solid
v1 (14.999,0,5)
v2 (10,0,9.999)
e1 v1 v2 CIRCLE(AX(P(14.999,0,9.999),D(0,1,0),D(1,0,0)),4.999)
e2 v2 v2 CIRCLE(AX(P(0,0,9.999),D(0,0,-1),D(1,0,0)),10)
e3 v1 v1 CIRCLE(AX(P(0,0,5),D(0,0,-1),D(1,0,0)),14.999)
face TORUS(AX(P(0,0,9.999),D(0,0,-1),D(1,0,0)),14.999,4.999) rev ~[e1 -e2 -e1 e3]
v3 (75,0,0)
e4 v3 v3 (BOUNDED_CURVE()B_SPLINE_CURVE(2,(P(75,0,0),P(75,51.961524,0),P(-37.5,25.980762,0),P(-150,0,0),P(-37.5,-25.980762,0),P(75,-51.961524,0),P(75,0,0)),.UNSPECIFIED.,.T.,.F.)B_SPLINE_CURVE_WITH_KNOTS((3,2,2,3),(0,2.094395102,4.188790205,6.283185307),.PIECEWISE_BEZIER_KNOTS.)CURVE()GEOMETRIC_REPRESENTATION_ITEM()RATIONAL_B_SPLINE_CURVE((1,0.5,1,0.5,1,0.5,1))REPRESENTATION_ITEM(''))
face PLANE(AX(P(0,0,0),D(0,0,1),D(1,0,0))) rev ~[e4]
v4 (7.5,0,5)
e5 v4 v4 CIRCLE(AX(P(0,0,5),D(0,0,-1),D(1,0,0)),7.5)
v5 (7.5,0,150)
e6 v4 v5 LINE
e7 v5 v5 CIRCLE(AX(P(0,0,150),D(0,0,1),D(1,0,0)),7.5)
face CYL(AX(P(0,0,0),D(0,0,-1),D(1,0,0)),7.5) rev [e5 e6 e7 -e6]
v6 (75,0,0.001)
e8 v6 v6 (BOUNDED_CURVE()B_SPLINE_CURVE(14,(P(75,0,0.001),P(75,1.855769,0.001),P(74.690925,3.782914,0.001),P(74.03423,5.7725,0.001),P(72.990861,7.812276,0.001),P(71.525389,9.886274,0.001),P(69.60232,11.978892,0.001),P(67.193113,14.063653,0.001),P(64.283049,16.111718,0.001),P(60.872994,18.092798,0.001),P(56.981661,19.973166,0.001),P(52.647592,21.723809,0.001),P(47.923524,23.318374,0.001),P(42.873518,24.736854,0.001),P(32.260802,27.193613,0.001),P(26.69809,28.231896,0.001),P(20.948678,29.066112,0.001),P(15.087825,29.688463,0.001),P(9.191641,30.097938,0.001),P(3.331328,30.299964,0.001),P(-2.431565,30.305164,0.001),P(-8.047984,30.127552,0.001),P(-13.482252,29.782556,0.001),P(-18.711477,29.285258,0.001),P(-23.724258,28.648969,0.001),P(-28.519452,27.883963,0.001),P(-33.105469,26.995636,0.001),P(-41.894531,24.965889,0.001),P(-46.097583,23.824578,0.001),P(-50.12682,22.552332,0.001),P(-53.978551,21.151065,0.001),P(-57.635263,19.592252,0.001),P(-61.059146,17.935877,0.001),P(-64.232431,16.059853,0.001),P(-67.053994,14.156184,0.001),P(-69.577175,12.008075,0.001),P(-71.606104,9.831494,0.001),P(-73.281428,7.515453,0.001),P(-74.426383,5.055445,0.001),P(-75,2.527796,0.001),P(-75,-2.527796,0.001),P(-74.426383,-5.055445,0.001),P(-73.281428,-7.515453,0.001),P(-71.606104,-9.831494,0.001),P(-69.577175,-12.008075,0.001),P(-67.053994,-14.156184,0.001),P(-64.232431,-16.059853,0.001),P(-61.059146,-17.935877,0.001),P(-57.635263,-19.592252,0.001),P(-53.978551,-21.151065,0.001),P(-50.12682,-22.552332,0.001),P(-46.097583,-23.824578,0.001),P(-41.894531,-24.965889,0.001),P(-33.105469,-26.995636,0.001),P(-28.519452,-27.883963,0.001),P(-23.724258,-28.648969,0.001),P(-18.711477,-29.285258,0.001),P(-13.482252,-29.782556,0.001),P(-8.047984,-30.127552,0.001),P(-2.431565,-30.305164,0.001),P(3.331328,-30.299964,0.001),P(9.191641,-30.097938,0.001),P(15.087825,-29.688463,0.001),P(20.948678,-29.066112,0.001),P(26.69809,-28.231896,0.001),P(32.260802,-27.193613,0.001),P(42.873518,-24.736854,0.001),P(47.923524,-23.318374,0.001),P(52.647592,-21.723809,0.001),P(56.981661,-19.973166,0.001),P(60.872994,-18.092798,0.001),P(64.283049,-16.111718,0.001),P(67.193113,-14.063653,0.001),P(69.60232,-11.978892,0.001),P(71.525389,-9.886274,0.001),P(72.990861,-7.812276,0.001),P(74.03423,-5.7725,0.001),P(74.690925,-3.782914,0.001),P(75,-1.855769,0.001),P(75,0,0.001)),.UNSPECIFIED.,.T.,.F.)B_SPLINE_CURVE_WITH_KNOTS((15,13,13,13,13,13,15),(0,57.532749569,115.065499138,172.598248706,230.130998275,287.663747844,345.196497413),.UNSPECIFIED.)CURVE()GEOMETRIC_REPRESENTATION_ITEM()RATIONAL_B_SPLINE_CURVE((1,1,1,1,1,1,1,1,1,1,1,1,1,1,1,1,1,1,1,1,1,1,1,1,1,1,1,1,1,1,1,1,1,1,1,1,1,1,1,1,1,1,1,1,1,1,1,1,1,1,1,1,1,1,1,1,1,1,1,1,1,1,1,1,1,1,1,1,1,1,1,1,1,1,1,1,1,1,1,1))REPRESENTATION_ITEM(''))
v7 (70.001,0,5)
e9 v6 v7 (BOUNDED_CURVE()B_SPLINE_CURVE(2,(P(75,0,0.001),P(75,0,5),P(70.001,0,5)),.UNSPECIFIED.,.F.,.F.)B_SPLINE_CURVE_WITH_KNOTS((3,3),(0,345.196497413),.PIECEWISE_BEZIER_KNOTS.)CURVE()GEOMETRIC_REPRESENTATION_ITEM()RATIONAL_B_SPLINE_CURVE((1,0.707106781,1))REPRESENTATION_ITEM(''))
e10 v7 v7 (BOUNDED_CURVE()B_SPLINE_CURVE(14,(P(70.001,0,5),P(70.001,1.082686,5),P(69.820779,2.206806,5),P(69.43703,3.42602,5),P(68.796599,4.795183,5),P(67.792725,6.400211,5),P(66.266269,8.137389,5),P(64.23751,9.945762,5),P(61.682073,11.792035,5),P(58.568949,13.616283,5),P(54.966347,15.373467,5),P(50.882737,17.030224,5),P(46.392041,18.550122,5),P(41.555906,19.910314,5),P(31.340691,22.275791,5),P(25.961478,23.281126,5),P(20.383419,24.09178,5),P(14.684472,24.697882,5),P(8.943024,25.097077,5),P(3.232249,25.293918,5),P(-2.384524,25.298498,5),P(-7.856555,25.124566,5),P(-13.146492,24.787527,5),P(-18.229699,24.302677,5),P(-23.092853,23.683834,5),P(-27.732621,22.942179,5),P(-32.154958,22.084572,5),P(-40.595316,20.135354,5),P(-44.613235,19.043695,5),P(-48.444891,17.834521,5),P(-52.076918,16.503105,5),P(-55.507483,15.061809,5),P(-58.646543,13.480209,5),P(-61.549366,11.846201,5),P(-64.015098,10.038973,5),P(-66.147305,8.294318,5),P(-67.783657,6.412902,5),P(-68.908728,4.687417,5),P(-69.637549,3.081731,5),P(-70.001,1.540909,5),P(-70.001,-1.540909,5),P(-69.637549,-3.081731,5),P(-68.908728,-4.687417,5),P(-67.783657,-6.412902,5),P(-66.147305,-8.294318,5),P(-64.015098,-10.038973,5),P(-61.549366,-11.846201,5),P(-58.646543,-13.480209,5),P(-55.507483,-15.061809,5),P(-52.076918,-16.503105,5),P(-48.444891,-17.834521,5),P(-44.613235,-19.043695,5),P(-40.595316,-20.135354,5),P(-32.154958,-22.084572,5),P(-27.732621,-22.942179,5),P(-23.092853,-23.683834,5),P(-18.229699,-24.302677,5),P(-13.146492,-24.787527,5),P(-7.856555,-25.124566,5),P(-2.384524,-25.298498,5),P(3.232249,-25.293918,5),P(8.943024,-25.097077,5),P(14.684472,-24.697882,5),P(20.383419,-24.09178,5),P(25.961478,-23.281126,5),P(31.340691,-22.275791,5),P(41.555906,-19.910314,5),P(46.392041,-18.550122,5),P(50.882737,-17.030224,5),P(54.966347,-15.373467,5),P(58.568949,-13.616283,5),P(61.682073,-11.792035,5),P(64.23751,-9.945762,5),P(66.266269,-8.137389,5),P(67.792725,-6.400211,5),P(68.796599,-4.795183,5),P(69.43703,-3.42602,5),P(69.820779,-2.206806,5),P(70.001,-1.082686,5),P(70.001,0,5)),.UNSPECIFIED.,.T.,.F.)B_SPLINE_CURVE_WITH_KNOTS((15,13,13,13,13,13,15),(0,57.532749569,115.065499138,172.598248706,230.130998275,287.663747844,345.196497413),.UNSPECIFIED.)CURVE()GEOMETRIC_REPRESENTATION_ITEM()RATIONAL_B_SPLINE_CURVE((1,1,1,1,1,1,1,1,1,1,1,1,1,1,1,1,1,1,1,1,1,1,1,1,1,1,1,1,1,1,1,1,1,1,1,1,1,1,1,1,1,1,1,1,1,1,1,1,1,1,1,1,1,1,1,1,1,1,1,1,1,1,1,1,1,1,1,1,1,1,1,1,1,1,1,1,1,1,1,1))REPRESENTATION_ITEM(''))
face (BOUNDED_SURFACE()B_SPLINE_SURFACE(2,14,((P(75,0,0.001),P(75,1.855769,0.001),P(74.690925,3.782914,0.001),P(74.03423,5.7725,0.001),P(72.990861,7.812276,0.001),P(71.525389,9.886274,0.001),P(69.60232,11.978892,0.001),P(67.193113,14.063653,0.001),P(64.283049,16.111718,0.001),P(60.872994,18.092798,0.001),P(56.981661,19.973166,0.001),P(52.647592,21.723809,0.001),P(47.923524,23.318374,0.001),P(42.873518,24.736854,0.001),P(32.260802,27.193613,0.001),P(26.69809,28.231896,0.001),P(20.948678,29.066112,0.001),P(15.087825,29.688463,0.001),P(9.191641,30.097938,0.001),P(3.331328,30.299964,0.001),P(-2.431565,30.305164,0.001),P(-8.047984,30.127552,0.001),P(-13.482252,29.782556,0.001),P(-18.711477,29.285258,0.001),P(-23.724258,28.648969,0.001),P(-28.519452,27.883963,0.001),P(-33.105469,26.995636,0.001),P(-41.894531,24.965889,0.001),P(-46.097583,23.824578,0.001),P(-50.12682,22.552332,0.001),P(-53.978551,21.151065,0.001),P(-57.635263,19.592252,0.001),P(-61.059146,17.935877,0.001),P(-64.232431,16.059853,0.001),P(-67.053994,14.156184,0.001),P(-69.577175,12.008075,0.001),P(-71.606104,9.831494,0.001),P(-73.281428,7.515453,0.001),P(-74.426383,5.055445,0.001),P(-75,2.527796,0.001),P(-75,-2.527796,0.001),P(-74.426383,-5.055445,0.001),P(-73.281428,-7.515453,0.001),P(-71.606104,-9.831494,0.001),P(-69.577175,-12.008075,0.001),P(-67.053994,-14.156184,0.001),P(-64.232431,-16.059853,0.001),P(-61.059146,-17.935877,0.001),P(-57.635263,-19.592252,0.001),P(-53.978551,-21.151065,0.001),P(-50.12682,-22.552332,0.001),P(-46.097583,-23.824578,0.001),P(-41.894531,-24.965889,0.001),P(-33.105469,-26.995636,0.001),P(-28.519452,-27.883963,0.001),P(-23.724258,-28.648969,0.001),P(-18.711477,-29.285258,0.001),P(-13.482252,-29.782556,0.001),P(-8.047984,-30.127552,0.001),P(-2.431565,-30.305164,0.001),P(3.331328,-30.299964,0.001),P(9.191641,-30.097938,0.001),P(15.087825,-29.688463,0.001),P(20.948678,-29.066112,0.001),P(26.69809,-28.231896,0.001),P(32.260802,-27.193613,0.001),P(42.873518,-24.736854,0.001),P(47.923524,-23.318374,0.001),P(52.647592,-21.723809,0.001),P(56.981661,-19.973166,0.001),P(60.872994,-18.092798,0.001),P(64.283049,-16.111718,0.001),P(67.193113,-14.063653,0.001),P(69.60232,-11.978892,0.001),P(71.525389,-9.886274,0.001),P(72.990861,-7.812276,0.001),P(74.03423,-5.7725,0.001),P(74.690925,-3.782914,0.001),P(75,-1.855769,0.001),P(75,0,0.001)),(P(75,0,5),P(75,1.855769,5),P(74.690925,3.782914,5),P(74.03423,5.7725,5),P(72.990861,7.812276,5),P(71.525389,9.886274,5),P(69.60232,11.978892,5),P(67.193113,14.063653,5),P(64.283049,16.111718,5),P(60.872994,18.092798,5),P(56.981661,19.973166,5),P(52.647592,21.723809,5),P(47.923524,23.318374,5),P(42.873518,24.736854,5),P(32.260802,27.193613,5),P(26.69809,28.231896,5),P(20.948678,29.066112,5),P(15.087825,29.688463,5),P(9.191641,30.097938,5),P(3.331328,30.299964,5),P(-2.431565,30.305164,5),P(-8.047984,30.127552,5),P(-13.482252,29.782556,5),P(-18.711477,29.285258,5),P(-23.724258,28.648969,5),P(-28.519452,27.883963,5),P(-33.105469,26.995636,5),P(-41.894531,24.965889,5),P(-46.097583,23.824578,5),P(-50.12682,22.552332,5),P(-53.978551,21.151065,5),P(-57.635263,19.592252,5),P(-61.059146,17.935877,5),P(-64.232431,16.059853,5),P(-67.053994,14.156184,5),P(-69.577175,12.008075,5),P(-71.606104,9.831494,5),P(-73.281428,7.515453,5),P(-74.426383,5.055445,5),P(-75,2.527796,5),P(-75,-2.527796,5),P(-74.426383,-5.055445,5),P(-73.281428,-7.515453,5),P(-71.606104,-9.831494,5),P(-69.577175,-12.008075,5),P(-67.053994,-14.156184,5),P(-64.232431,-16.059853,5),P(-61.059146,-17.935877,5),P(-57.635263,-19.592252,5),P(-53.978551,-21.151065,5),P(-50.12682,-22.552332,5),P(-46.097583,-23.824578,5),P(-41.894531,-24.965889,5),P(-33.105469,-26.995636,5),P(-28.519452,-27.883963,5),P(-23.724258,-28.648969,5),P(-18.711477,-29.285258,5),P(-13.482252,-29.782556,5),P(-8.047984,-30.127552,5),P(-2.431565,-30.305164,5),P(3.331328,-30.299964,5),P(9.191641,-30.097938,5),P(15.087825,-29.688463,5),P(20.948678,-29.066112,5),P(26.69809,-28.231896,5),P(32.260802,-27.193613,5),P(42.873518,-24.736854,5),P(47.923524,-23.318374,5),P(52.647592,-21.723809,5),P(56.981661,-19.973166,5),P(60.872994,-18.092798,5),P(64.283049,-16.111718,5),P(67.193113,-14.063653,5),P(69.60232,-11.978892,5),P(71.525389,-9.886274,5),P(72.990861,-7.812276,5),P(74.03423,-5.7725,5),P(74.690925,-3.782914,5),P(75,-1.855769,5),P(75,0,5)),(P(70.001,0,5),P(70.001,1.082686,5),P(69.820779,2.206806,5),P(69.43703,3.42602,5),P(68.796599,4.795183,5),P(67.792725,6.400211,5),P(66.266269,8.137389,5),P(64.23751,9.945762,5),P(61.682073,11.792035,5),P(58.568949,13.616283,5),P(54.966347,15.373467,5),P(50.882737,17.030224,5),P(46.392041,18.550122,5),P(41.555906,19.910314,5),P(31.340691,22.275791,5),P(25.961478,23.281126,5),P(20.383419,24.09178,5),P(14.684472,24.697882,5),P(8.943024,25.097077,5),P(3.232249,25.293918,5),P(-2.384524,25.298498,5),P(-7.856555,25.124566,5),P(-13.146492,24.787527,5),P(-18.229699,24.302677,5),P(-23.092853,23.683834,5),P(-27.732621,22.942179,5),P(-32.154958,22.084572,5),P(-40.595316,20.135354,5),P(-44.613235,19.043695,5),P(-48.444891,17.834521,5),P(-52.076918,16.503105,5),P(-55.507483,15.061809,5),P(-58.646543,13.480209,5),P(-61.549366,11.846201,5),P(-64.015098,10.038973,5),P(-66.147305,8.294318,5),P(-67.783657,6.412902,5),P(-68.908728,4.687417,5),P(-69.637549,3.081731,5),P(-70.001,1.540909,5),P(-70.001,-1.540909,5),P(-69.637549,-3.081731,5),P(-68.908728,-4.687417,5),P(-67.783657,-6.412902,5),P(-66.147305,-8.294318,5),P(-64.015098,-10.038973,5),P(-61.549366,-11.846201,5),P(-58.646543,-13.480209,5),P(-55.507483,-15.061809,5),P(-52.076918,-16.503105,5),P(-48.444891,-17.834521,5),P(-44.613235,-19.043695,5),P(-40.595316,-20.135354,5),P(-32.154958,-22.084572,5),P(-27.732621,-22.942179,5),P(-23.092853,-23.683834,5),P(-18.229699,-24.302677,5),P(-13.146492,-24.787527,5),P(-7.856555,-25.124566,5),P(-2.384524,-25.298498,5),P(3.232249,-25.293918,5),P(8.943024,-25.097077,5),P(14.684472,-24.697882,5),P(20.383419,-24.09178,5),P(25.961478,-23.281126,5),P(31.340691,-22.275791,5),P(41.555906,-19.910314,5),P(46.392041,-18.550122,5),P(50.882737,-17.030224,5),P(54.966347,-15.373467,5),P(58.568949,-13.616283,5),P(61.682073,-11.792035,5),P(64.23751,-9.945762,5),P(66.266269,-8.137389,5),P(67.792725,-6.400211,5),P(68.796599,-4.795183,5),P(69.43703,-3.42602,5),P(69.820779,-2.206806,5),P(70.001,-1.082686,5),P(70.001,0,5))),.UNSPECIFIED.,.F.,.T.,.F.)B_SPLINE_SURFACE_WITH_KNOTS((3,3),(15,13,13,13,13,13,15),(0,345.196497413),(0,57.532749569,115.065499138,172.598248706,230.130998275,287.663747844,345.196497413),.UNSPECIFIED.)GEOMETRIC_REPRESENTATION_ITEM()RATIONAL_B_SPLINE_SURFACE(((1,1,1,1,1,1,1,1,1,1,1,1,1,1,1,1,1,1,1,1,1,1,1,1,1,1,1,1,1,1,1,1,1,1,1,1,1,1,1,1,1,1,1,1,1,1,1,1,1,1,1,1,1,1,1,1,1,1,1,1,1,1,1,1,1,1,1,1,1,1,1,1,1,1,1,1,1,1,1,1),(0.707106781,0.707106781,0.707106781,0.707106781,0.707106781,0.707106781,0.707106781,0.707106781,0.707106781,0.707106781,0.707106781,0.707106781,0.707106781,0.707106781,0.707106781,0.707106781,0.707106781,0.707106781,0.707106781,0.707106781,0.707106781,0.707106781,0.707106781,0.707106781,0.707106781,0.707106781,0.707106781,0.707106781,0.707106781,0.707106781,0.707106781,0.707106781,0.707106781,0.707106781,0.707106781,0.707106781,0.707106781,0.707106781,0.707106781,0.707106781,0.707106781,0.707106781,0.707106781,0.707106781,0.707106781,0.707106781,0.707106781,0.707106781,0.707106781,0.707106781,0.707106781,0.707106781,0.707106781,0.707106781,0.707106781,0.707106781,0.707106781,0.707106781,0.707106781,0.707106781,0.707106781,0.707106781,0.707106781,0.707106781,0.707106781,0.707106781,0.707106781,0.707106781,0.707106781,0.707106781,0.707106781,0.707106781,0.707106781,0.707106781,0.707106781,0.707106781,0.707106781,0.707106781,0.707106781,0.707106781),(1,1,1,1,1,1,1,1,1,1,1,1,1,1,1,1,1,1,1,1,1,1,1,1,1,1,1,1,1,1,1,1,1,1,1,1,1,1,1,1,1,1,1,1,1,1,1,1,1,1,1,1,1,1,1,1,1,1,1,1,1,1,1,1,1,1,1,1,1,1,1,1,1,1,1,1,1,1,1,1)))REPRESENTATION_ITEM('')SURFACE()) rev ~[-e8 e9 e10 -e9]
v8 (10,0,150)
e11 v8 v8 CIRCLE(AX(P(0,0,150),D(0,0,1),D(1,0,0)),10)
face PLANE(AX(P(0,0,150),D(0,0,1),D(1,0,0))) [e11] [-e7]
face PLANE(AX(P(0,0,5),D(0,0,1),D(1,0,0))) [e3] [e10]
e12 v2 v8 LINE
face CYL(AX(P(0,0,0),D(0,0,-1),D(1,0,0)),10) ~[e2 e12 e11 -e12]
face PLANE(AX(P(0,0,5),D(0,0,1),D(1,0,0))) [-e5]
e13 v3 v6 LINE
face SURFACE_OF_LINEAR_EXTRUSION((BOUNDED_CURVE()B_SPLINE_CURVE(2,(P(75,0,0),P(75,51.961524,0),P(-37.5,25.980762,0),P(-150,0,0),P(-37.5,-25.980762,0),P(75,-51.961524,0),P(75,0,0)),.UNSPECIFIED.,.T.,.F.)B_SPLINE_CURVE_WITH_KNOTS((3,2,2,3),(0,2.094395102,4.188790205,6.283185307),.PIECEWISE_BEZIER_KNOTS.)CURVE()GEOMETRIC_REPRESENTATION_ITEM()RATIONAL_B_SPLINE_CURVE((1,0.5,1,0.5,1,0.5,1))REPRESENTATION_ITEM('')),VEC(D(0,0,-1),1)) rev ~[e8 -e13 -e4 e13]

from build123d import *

# Parameters (mm, degrees)
F1_R     = 10
F2_DEPTH = 150
F3_T     = -2.5
F4_DEPTH = 5
F5_R     = 4.999


# Not quite as in the source:
# - a fillet or chamfer is up to 0.001 mm smaller than in the source, because OpenCascade refuses the exact size


with BuildPart() as f2:
    # F1 (on Top) → F2 (new body)
    with BuildSketch(Plane.XY):
        Circle(F1_R)
    extrude(amount=F2_DEPTH)

    # F3
    f3_openings = [f2.faces().sort_by_distance(p)[0] for p in [
        (0, 0, 150),
    ]]
    offset(amount=F3_T, openings=f3_openings)

    # F0 (on Top) → F4 (join)
    with BuildSketch(Plane.XY):
        with BuildLine():
            add(Edge.make_bspline(
                [(75, 0), (75, 51.9615242271), (-37.5, 25.9807621135), (-150, 0), (-37.5, -25.9807621135), (75, -51.9615242271), (75, 0)],
                knots=[0, 0, 0, 2.0943951024, 2.0943951024, 4.1887902048, 4.1887902048, 6.2831853072, 6.2831853072, 6.2831853072], degree=2, weights=[1, 0.5, 1, 0.5, 1, 0.5, 1]))
        make_face()
    extrude(amount=F4_DEPTH)

    # F5 (radius 5 in the source; OpenCascade refuses exactly that, so slightly less here)
    f5_edges = [f2.edges().sort_by_distance(p)[0] for p in [
        (-10, 0, 5),
        (-75, 9.6e-05, 5),
    ]]
    fillet(f5_edges, radius=F5_R)


solid = f2.part
